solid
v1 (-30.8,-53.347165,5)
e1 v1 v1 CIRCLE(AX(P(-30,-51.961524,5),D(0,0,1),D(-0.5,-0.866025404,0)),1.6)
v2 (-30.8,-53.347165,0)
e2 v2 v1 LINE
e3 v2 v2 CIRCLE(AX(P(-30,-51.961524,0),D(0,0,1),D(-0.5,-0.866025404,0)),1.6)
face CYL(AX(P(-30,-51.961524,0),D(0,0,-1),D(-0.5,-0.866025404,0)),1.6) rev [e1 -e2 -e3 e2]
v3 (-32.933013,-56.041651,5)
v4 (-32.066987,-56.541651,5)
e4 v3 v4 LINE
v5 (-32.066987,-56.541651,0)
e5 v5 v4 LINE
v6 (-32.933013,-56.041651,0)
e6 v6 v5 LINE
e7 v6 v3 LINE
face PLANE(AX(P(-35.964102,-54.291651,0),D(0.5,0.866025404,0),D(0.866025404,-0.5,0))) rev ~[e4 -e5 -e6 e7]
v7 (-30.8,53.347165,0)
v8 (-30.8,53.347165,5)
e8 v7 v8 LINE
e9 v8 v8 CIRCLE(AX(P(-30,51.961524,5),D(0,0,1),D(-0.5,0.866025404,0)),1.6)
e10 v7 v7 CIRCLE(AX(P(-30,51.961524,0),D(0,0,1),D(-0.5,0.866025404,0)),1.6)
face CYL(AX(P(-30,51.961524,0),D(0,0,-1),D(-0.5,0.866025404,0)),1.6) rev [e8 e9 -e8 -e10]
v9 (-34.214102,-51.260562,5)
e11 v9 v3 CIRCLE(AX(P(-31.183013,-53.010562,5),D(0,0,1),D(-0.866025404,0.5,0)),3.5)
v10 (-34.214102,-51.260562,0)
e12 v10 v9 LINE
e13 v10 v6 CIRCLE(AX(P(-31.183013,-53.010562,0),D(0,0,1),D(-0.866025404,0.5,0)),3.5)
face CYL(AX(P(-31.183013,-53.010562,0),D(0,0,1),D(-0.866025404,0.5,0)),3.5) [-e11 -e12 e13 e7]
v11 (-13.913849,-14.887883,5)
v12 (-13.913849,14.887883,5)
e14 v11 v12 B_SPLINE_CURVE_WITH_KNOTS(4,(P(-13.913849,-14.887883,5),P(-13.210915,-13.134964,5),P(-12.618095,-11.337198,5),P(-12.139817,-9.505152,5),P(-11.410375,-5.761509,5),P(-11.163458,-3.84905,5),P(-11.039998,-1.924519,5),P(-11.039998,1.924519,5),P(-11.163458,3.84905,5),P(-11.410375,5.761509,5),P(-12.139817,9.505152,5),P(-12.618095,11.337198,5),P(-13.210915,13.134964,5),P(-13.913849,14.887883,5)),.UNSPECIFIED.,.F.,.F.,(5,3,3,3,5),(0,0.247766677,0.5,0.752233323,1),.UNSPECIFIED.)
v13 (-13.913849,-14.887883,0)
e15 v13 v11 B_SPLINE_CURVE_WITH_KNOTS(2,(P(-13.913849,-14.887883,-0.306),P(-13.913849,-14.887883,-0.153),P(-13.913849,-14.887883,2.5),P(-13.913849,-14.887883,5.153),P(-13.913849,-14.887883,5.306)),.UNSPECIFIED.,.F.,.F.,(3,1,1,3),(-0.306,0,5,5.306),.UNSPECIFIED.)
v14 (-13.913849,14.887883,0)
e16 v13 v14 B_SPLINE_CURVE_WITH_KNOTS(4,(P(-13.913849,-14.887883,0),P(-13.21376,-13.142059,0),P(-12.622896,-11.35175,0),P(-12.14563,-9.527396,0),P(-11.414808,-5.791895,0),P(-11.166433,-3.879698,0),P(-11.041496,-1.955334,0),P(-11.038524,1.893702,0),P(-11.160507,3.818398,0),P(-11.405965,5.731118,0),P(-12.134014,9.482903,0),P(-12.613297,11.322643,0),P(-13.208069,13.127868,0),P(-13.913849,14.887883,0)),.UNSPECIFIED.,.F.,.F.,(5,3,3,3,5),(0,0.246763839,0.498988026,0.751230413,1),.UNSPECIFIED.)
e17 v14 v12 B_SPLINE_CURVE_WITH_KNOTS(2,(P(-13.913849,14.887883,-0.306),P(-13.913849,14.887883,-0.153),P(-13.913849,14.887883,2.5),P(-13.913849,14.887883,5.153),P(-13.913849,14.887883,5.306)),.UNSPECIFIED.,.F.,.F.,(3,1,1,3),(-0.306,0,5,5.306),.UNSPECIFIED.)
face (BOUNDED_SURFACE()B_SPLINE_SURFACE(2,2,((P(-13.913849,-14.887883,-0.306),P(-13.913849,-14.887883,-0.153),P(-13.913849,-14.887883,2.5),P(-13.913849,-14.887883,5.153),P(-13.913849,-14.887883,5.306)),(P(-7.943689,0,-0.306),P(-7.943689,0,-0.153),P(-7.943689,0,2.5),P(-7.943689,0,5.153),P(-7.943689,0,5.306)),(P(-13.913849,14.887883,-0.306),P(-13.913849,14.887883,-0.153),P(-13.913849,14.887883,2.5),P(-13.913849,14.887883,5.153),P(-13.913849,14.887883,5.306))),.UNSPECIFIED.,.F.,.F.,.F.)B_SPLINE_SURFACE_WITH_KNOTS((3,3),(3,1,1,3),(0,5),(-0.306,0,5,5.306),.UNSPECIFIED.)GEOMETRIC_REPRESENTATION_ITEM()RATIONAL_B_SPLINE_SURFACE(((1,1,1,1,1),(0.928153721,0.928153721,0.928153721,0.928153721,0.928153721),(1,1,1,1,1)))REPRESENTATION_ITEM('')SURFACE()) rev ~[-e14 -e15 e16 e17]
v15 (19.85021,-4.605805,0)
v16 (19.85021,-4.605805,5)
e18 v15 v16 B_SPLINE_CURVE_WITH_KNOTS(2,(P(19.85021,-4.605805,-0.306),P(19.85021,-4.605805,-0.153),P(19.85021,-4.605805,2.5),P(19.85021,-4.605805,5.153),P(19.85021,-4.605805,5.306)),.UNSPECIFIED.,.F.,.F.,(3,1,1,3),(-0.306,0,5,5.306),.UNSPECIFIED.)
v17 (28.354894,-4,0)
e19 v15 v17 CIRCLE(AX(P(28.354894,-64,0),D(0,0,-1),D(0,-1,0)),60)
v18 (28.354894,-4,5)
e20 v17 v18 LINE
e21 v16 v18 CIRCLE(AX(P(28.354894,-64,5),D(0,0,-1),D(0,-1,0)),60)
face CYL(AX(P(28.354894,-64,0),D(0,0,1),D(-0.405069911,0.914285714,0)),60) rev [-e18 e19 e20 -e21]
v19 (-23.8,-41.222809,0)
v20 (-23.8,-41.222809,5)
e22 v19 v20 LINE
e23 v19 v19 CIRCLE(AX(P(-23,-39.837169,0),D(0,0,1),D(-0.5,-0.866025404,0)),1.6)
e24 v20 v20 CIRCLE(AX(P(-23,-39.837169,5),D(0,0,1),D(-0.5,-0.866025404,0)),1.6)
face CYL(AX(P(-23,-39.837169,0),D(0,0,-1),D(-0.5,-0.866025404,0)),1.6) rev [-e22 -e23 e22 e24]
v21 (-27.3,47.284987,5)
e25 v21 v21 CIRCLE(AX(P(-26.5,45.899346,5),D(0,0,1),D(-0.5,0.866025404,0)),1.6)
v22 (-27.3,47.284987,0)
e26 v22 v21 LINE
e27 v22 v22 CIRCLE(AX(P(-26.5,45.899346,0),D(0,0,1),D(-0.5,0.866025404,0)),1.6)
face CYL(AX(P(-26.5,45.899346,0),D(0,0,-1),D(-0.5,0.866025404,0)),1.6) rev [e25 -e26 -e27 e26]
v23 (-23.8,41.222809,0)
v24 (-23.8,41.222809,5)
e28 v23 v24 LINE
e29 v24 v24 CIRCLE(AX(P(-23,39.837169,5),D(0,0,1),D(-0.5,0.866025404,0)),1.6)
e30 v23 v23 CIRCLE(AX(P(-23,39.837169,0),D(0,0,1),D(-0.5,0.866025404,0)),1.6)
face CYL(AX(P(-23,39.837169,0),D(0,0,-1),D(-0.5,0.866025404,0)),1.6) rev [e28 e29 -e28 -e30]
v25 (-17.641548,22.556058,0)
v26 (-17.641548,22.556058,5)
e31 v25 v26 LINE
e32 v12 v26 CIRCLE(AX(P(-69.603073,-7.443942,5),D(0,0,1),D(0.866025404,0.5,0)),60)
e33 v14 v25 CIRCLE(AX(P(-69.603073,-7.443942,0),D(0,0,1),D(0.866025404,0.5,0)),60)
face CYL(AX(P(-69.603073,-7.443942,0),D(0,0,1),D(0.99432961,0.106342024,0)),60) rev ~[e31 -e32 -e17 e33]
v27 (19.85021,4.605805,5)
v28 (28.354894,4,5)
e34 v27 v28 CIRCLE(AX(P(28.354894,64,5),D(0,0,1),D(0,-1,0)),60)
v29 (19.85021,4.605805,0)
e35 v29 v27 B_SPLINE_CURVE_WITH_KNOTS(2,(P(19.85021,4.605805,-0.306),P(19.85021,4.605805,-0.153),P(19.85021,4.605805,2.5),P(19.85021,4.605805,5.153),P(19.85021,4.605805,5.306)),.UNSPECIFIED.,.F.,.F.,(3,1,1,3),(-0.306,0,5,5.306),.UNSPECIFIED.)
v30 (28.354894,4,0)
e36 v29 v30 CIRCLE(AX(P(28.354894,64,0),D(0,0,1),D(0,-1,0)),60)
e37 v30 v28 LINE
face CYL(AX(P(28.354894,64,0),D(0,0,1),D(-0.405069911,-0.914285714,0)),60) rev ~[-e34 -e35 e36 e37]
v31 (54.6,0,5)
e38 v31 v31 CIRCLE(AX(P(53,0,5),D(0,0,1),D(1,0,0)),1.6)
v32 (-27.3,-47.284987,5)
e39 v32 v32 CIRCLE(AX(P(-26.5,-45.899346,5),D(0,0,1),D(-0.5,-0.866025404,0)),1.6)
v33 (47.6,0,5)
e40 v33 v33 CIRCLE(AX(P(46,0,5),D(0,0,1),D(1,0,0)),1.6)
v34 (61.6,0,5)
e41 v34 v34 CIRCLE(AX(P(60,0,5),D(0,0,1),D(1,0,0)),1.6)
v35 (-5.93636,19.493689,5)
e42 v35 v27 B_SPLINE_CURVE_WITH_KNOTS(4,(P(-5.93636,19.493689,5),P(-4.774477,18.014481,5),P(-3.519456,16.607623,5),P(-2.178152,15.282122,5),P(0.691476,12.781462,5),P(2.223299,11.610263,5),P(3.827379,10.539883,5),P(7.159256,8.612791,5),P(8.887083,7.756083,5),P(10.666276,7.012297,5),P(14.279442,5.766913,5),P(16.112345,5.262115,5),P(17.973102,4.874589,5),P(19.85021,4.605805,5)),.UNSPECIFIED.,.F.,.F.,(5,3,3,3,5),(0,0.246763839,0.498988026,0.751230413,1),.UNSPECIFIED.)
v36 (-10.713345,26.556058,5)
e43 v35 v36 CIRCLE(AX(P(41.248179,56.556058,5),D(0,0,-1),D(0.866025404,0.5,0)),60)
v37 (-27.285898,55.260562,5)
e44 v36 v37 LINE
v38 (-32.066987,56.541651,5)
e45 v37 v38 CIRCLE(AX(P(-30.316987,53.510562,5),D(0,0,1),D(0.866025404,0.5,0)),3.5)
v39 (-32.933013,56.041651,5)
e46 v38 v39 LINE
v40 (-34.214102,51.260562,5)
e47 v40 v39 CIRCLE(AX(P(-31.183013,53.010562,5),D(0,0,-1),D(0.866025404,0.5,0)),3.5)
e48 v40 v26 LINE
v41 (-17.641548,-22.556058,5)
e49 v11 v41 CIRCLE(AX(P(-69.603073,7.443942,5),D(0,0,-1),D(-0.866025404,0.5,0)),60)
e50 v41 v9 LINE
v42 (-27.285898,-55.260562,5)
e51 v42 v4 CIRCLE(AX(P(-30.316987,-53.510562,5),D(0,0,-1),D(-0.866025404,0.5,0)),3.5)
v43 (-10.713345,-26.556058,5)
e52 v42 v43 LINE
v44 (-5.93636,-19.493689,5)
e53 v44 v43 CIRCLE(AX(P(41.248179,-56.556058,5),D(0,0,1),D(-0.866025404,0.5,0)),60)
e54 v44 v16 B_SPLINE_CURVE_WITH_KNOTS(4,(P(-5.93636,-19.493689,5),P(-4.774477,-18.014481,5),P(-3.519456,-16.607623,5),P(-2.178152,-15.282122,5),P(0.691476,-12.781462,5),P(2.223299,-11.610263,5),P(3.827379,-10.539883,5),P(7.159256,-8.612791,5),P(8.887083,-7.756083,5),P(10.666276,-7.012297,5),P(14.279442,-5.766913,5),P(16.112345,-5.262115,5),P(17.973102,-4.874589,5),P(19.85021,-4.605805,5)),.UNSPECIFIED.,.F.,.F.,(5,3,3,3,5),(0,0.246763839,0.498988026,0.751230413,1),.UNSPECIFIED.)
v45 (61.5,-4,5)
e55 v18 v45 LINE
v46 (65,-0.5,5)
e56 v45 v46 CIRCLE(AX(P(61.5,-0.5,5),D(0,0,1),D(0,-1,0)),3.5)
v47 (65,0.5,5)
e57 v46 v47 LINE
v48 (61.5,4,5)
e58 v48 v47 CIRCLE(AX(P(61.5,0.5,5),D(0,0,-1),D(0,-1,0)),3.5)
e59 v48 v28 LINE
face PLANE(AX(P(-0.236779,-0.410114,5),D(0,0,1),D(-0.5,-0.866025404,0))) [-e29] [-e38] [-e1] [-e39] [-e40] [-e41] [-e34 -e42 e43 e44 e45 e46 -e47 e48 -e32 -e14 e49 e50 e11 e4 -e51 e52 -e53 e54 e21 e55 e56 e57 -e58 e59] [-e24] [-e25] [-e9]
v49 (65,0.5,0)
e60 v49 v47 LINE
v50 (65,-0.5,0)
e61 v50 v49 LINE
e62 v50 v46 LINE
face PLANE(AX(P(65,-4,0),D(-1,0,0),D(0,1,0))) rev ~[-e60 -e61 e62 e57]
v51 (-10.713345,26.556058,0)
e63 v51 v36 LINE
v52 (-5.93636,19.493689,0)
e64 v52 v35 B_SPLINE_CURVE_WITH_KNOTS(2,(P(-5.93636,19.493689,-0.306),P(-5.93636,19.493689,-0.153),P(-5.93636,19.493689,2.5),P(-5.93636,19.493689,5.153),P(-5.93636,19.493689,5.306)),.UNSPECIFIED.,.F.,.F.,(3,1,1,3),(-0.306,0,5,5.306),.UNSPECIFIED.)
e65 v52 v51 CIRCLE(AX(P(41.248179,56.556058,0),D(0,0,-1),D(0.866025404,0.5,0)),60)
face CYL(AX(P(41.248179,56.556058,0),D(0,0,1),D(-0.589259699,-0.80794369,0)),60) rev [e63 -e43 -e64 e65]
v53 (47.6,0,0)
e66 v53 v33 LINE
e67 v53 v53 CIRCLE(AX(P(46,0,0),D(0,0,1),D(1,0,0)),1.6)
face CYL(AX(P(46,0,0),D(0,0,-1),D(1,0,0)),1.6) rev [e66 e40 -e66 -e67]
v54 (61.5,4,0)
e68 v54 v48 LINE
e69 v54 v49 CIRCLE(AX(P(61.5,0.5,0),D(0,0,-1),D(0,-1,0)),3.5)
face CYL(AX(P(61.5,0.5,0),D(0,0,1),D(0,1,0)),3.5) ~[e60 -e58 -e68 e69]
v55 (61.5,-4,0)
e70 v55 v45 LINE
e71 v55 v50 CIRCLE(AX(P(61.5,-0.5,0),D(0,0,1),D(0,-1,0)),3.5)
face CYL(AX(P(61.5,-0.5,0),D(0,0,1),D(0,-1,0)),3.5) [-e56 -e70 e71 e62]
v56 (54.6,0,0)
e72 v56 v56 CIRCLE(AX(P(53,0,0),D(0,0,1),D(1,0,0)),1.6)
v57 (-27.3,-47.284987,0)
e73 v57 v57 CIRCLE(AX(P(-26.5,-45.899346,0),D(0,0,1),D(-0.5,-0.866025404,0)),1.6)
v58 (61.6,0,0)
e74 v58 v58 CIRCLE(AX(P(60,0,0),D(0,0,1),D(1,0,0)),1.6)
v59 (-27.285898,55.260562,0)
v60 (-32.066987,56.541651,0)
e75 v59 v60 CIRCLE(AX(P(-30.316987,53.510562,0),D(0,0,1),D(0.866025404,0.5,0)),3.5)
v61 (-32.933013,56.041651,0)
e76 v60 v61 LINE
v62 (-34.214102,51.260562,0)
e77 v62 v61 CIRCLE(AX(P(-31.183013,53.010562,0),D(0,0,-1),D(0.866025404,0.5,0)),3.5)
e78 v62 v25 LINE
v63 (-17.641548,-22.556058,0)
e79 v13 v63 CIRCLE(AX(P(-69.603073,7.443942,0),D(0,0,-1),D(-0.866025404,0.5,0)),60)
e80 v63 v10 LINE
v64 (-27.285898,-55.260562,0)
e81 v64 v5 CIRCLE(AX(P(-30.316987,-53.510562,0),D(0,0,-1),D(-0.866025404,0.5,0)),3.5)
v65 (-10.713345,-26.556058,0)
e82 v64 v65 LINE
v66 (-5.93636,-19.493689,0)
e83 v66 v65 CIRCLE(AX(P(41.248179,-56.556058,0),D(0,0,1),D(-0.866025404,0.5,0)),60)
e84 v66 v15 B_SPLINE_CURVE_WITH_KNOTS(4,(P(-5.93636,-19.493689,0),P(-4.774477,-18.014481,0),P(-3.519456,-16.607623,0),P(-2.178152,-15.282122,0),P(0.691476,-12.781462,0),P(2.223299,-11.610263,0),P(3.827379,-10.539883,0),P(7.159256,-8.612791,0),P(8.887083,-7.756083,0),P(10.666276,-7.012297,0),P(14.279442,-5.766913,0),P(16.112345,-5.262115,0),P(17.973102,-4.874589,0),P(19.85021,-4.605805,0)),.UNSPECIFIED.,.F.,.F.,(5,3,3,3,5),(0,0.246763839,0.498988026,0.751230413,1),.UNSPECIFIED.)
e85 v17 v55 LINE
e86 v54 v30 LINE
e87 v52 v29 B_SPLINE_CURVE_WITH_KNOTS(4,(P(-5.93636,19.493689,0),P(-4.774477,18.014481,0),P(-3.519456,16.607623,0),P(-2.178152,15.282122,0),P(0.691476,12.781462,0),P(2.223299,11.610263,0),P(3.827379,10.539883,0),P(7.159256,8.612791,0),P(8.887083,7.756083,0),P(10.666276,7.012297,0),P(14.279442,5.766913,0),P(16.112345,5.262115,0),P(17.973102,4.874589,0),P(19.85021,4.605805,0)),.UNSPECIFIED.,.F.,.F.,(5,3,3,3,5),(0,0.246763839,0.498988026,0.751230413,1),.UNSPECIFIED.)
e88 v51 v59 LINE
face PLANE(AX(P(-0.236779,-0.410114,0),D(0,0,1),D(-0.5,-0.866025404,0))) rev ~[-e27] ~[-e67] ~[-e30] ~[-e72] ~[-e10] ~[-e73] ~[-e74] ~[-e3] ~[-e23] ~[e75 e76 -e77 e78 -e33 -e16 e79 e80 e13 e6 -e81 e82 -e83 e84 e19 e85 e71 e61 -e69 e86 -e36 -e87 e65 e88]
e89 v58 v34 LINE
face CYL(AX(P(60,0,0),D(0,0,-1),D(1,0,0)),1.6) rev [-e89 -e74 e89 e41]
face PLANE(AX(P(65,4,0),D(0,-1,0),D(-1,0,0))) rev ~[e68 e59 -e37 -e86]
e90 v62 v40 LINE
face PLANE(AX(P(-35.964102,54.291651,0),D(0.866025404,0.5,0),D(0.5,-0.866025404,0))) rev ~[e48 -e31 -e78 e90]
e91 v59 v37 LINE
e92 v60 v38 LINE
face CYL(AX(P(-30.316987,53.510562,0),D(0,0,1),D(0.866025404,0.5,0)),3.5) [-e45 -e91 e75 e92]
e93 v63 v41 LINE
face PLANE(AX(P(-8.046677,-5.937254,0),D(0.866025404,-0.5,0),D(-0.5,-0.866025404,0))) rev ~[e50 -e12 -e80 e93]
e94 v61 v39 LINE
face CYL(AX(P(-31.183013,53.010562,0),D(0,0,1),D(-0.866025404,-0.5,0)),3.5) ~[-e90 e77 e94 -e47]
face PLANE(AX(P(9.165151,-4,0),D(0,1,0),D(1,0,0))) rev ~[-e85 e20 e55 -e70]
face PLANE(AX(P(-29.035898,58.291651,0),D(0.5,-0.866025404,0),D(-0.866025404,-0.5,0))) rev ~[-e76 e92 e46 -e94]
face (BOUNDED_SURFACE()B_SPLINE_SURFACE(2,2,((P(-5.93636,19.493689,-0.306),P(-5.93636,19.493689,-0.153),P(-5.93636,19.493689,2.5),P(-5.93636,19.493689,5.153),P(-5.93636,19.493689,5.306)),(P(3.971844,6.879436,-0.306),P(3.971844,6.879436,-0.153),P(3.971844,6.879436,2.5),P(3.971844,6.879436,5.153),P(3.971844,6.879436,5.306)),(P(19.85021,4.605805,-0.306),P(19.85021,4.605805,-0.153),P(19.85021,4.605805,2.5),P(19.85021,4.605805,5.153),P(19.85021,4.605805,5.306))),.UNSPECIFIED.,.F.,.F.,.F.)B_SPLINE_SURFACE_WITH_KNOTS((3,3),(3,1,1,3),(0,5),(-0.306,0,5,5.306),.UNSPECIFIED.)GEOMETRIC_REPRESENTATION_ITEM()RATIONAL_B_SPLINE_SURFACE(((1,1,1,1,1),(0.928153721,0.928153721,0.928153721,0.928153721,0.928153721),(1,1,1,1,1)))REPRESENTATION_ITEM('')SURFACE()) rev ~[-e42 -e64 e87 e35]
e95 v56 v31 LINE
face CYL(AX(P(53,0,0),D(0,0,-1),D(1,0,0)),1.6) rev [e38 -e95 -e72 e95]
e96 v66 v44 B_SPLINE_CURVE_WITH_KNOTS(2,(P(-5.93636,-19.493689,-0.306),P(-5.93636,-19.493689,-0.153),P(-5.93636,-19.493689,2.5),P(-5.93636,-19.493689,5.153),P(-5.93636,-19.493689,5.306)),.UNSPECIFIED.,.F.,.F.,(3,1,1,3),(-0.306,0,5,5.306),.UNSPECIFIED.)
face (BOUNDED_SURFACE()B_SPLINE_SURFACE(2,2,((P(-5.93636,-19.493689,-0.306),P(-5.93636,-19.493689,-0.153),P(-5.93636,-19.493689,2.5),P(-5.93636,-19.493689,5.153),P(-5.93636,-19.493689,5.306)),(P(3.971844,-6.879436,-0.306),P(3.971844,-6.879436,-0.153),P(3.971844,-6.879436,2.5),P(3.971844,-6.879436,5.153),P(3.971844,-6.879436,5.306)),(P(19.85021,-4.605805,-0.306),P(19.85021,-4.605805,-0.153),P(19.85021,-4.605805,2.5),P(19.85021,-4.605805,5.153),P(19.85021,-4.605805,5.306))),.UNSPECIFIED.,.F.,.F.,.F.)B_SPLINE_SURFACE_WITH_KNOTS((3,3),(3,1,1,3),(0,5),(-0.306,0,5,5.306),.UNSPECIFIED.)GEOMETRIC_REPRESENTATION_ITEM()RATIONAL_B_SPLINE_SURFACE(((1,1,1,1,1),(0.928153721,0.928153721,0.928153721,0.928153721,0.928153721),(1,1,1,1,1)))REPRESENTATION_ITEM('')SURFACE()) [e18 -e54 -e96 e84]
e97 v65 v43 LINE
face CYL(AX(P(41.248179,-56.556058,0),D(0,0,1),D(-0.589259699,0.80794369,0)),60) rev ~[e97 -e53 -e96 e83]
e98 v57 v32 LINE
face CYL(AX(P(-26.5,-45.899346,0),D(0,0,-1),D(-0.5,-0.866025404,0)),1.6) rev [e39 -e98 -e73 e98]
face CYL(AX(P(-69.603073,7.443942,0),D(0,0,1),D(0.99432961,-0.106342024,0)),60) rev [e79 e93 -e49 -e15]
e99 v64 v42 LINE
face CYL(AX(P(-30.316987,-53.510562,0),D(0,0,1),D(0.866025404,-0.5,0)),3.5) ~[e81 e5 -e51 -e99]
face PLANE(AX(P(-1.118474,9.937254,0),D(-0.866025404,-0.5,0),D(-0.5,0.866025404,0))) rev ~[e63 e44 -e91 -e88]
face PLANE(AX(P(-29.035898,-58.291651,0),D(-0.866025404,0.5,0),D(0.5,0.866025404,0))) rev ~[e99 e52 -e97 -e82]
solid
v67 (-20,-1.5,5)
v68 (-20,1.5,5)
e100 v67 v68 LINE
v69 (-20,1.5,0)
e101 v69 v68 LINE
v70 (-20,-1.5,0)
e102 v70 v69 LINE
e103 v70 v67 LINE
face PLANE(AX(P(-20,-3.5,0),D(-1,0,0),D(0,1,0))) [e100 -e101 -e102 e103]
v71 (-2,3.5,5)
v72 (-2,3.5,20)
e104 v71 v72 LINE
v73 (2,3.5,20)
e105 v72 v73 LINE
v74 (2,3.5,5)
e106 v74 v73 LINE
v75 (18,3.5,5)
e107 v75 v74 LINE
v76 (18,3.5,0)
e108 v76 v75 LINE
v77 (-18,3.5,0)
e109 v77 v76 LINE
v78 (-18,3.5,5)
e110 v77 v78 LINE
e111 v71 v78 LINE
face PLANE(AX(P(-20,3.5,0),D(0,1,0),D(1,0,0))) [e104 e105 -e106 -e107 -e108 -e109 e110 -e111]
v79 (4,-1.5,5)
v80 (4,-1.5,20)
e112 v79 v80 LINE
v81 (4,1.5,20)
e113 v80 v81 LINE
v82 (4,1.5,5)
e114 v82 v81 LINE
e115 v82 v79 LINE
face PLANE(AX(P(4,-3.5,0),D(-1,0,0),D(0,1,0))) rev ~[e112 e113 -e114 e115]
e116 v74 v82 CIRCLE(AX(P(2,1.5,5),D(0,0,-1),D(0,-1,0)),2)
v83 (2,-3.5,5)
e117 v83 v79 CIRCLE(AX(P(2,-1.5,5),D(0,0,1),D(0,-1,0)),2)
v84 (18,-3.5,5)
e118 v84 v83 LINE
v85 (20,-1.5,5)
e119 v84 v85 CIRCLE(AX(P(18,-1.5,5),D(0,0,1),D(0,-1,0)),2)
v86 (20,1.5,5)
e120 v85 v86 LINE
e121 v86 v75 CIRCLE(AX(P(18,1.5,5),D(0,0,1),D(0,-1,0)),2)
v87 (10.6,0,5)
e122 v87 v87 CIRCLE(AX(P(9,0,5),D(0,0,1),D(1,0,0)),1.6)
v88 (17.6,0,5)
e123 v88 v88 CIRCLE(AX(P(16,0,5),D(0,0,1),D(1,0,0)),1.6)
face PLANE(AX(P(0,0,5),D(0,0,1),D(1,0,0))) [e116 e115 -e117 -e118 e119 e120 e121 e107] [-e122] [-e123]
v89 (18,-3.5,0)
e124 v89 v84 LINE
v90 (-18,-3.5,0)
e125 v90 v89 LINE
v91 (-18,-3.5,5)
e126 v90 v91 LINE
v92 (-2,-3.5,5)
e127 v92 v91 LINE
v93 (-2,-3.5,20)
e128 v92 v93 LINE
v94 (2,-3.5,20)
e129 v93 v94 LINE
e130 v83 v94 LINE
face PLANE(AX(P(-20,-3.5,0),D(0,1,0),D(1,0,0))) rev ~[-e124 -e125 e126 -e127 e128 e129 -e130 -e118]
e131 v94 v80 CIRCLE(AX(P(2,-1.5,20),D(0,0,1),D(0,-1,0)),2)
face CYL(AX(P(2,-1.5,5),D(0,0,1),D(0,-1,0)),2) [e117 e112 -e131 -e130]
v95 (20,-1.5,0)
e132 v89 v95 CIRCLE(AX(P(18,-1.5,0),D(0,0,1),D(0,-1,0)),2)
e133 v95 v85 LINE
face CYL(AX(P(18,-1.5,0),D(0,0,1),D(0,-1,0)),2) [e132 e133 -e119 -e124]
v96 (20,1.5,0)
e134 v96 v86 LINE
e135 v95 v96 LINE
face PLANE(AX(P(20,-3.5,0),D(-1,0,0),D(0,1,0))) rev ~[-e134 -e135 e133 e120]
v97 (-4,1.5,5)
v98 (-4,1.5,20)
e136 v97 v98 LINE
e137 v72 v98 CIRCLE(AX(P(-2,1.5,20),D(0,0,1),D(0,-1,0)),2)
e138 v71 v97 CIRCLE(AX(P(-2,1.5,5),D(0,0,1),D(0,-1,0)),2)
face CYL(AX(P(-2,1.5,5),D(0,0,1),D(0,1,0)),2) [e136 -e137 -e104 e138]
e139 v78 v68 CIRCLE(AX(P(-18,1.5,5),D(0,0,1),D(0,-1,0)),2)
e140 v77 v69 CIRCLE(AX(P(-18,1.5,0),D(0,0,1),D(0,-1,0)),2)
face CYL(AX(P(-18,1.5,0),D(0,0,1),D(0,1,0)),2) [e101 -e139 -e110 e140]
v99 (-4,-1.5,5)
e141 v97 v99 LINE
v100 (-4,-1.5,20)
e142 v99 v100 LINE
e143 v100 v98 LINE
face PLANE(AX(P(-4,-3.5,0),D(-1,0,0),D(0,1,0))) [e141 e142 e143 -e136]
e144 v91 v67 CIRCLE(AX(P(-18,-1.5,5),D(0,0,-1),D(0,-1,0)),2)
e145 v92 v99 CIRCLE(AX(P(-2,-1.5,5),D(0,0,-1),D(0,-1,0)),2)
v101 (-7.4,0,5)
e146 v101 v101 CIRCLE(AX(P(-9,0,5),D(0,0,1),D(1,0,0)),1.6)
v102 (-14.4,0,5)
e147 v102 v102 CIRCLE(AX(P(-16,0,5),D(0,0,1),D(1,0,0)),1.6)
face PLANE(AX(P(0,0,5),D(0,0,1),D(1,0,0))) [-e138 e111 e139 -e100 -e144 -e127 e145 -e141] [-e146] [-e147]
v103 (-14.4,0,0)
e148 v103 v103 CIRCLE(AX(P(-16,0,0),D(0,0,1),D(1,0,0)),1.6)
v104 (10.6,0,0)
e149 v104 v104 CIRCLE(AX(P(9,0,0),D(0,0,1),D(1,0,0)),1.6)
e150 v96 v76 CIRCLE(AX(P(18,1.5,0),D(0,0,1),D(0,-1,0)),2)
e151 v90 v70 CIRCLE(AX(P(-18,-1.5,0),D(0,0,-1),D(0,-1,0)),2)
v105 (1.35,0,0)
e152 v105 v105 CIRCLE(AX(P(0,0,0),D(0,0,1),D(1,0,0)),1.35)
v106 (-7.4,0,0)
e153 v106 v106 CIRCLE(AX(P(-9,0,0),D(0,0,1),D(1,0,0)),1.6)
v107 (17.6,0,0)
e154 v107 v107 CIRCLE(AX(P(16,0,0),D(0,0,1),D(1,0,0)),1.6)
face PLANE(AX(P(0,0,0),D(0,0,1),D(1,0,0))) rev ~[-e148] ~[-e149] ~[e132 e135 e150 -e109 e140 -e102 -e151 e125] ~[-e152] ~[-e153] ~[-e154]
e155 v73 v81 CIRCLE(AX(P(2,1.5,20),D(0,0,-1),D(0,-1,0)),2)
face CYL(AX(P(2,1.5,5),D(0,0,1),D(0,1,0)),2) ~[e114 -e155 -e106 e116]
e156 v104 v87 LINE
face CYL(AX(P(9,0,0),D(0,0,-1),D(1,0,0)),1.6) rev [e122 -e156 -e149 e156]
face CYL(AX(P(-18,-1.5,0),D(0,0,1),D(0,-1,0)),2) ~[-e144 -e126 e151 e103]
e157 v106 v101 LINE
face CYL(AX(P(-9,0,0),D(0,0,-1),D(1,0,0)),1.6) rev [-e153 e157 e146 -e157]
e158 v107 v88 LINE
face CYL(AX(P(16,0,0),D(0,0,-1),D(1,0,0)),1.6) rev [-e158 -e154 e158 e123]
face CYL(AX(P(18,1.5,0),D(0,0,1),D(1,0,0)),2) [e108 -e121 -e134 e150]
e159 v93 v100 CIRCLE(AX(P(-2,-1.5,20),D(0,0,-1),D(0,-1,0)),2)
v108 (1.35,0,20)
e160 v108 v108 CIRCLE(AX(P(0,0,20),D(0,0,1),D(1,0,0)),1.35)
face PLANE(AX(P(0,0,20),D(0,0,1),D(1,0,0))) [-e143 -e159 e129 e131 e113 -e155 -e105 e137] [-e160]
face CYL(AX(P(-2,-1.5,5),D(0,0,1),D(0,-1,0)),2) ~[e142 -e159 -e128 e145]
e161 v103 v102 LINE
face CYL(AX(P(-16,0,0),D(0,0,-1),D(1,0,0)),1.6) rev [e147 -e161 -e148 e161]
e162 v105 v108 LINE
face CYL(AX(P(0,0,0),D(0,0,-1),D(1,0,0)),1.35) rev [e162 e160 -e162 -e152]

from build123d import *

# Parameters (mm, degrees)
F0_W      = 40
F0_H      = 7
F0_R      = 1.6
F0_R_2    = 1.35
F1_DEPTH  = 5
F2_W      = 8
F2_H      = 7
F2_R      = 1.35
F3_DEPTH  = 20
F4_R      = 2
F5_R      = 1.6
F6_DEPTH  = 5
F7_R      = 60
F8_R      = 3.5
F10_COUNT = 3
F11_R     = 40


with BuildPart() as f1:
    # F0 (on Top) → F1 (new body)
    with BuildSketch(Plane.XY):
        Rectangle(F0_W, F0_H)
        with Locations((-16, 0)):
            Circle(F0_R, mode=Mode.SUBTRACT)
        with Locations((-9, 0)):
            Circle(F0_R, mode=Mode.SUBTRACT)
        Circle(F0_R_2, mode=Mode.SUBTRACT)
        with Locations((9, 0)):
            Circle(F0_R, mode=Mode.SUBTRACT)
        with Locations((16, 0)):
            Circle(F0_R, mode=Mode.SUBTRACT)
    extrude(amount=F1_DEPTH)

    # F2 (on Top) → F3 (join)
    with BuildSketch(Plane.XY):
        Rectangle(F2_W, F2_H)
        Circle(F2_R, mode=Mode.SUBTRACT)
    extrude(amount=F3_DEPTH)

    # F4
    f4_edges = [f1.edges().sort_by_distance(p)[0] for p in [
        (-20, -3.5, 2.5),
        (-20, 3.5, 2.5),
        (20, -3.5, 2.5),
        (-4, -3.5, 12.5),
        (4, -3.5, 12.5),
        (-4, 3.5, 12.5),
        (20, 3.5, 2.5),
        (4, 3.5, 12.5),
    ]]
    fillet(f4_edges, radius=F4_R)


with BuildPart() as f6:
    # F5 (on Top) → F6 (new body)
    with BuildSketch(Plane.XY):
        with BuildLine():
            Line((0, -4), (0, 4))
            Line((0, 4), (9.1651513899, 4))
            ThreePointArc((9.1651513899, 4), (-10, 0), (9.1651513899, -4))
            Line((9.1651513899, -4), (0, -4))
        make_face()
        with BuildLine():
            Line((9.1651513899, 4), (0, 4))
            Line((0, 4), (0, -4))
            Line((0, -4), (9.1651513899, -4))
            ThreePointArc((9.1651513899, -4), (9.7890631293, -2.0430964369), (10, 0))
            ThreePointArc((10, 0), (9.7890631293, 2.0430964369), (9.1651513899, 4))
        make_face()
        with BuildLine():
            Line((65, 4), (9.1651513899, 4))
            ThreePointArc((9.1651513899, 4), (9.7890631293, 2.0430964369), (10, 0))
            ThreePointArc((10, 0), (9.7890631293, -2.0430964369), (9.1651513899, -4))
            Line((9.1651513899, -4), (65, -4))
            Line((65, -4), (65, 4))
        make_face()
        with Locations((46, 0)):
            Circle(F5_R, mode=Mode.SUBTRACT)
        with Locations((53, 0)):
            Circle(F5_R, mode=Mode.SUBTRACT)
        with Locations((60, 0)):
            Circle(F5_R, mode=Mode.SUBTRACT)
    extrude(amount=F6_DEPTH)

    # F7
    f7_edges = [f6.edges().sort_by_distance(p)[0] for p in [
        (9.165151, -4, 2.5),
        (9.165151, 4, 2.5),
    ]]
    fillet(f7_edges, radius=F7_R)

    # F8
    f8_edges = [f6.edges().sort_by_distance(p)[0] for p in [
        (65, -4, 2.5),
        (65, 4, 2.5),
    ]]
    fillet(f8_edges, radius=F8_R)

    # F10: F6 ×3 about axis
    f10_axis = Axis((0, 0, 9.6070729196), (0, 0, 1))


with BuildPart() as f6_1:
    add(f6.part)
    for i in range(1, F10_COUNT):
        add(f6.part.rotate(f10_axis, i * 360 / F10_COUNT))

    # F11
    f11_edges = [f6_1.edges().sort_by_distance(p)[0] for p in [
        (5.033316, -8.717959, 2.5),
        (-10.066632, 0, 2.5),
        (5.033316, 8.717959, 2.5),
    ]]
    fillet(f11_edges, radius=F11_R)


solid = Compound([f1.part, f6_1.part])
